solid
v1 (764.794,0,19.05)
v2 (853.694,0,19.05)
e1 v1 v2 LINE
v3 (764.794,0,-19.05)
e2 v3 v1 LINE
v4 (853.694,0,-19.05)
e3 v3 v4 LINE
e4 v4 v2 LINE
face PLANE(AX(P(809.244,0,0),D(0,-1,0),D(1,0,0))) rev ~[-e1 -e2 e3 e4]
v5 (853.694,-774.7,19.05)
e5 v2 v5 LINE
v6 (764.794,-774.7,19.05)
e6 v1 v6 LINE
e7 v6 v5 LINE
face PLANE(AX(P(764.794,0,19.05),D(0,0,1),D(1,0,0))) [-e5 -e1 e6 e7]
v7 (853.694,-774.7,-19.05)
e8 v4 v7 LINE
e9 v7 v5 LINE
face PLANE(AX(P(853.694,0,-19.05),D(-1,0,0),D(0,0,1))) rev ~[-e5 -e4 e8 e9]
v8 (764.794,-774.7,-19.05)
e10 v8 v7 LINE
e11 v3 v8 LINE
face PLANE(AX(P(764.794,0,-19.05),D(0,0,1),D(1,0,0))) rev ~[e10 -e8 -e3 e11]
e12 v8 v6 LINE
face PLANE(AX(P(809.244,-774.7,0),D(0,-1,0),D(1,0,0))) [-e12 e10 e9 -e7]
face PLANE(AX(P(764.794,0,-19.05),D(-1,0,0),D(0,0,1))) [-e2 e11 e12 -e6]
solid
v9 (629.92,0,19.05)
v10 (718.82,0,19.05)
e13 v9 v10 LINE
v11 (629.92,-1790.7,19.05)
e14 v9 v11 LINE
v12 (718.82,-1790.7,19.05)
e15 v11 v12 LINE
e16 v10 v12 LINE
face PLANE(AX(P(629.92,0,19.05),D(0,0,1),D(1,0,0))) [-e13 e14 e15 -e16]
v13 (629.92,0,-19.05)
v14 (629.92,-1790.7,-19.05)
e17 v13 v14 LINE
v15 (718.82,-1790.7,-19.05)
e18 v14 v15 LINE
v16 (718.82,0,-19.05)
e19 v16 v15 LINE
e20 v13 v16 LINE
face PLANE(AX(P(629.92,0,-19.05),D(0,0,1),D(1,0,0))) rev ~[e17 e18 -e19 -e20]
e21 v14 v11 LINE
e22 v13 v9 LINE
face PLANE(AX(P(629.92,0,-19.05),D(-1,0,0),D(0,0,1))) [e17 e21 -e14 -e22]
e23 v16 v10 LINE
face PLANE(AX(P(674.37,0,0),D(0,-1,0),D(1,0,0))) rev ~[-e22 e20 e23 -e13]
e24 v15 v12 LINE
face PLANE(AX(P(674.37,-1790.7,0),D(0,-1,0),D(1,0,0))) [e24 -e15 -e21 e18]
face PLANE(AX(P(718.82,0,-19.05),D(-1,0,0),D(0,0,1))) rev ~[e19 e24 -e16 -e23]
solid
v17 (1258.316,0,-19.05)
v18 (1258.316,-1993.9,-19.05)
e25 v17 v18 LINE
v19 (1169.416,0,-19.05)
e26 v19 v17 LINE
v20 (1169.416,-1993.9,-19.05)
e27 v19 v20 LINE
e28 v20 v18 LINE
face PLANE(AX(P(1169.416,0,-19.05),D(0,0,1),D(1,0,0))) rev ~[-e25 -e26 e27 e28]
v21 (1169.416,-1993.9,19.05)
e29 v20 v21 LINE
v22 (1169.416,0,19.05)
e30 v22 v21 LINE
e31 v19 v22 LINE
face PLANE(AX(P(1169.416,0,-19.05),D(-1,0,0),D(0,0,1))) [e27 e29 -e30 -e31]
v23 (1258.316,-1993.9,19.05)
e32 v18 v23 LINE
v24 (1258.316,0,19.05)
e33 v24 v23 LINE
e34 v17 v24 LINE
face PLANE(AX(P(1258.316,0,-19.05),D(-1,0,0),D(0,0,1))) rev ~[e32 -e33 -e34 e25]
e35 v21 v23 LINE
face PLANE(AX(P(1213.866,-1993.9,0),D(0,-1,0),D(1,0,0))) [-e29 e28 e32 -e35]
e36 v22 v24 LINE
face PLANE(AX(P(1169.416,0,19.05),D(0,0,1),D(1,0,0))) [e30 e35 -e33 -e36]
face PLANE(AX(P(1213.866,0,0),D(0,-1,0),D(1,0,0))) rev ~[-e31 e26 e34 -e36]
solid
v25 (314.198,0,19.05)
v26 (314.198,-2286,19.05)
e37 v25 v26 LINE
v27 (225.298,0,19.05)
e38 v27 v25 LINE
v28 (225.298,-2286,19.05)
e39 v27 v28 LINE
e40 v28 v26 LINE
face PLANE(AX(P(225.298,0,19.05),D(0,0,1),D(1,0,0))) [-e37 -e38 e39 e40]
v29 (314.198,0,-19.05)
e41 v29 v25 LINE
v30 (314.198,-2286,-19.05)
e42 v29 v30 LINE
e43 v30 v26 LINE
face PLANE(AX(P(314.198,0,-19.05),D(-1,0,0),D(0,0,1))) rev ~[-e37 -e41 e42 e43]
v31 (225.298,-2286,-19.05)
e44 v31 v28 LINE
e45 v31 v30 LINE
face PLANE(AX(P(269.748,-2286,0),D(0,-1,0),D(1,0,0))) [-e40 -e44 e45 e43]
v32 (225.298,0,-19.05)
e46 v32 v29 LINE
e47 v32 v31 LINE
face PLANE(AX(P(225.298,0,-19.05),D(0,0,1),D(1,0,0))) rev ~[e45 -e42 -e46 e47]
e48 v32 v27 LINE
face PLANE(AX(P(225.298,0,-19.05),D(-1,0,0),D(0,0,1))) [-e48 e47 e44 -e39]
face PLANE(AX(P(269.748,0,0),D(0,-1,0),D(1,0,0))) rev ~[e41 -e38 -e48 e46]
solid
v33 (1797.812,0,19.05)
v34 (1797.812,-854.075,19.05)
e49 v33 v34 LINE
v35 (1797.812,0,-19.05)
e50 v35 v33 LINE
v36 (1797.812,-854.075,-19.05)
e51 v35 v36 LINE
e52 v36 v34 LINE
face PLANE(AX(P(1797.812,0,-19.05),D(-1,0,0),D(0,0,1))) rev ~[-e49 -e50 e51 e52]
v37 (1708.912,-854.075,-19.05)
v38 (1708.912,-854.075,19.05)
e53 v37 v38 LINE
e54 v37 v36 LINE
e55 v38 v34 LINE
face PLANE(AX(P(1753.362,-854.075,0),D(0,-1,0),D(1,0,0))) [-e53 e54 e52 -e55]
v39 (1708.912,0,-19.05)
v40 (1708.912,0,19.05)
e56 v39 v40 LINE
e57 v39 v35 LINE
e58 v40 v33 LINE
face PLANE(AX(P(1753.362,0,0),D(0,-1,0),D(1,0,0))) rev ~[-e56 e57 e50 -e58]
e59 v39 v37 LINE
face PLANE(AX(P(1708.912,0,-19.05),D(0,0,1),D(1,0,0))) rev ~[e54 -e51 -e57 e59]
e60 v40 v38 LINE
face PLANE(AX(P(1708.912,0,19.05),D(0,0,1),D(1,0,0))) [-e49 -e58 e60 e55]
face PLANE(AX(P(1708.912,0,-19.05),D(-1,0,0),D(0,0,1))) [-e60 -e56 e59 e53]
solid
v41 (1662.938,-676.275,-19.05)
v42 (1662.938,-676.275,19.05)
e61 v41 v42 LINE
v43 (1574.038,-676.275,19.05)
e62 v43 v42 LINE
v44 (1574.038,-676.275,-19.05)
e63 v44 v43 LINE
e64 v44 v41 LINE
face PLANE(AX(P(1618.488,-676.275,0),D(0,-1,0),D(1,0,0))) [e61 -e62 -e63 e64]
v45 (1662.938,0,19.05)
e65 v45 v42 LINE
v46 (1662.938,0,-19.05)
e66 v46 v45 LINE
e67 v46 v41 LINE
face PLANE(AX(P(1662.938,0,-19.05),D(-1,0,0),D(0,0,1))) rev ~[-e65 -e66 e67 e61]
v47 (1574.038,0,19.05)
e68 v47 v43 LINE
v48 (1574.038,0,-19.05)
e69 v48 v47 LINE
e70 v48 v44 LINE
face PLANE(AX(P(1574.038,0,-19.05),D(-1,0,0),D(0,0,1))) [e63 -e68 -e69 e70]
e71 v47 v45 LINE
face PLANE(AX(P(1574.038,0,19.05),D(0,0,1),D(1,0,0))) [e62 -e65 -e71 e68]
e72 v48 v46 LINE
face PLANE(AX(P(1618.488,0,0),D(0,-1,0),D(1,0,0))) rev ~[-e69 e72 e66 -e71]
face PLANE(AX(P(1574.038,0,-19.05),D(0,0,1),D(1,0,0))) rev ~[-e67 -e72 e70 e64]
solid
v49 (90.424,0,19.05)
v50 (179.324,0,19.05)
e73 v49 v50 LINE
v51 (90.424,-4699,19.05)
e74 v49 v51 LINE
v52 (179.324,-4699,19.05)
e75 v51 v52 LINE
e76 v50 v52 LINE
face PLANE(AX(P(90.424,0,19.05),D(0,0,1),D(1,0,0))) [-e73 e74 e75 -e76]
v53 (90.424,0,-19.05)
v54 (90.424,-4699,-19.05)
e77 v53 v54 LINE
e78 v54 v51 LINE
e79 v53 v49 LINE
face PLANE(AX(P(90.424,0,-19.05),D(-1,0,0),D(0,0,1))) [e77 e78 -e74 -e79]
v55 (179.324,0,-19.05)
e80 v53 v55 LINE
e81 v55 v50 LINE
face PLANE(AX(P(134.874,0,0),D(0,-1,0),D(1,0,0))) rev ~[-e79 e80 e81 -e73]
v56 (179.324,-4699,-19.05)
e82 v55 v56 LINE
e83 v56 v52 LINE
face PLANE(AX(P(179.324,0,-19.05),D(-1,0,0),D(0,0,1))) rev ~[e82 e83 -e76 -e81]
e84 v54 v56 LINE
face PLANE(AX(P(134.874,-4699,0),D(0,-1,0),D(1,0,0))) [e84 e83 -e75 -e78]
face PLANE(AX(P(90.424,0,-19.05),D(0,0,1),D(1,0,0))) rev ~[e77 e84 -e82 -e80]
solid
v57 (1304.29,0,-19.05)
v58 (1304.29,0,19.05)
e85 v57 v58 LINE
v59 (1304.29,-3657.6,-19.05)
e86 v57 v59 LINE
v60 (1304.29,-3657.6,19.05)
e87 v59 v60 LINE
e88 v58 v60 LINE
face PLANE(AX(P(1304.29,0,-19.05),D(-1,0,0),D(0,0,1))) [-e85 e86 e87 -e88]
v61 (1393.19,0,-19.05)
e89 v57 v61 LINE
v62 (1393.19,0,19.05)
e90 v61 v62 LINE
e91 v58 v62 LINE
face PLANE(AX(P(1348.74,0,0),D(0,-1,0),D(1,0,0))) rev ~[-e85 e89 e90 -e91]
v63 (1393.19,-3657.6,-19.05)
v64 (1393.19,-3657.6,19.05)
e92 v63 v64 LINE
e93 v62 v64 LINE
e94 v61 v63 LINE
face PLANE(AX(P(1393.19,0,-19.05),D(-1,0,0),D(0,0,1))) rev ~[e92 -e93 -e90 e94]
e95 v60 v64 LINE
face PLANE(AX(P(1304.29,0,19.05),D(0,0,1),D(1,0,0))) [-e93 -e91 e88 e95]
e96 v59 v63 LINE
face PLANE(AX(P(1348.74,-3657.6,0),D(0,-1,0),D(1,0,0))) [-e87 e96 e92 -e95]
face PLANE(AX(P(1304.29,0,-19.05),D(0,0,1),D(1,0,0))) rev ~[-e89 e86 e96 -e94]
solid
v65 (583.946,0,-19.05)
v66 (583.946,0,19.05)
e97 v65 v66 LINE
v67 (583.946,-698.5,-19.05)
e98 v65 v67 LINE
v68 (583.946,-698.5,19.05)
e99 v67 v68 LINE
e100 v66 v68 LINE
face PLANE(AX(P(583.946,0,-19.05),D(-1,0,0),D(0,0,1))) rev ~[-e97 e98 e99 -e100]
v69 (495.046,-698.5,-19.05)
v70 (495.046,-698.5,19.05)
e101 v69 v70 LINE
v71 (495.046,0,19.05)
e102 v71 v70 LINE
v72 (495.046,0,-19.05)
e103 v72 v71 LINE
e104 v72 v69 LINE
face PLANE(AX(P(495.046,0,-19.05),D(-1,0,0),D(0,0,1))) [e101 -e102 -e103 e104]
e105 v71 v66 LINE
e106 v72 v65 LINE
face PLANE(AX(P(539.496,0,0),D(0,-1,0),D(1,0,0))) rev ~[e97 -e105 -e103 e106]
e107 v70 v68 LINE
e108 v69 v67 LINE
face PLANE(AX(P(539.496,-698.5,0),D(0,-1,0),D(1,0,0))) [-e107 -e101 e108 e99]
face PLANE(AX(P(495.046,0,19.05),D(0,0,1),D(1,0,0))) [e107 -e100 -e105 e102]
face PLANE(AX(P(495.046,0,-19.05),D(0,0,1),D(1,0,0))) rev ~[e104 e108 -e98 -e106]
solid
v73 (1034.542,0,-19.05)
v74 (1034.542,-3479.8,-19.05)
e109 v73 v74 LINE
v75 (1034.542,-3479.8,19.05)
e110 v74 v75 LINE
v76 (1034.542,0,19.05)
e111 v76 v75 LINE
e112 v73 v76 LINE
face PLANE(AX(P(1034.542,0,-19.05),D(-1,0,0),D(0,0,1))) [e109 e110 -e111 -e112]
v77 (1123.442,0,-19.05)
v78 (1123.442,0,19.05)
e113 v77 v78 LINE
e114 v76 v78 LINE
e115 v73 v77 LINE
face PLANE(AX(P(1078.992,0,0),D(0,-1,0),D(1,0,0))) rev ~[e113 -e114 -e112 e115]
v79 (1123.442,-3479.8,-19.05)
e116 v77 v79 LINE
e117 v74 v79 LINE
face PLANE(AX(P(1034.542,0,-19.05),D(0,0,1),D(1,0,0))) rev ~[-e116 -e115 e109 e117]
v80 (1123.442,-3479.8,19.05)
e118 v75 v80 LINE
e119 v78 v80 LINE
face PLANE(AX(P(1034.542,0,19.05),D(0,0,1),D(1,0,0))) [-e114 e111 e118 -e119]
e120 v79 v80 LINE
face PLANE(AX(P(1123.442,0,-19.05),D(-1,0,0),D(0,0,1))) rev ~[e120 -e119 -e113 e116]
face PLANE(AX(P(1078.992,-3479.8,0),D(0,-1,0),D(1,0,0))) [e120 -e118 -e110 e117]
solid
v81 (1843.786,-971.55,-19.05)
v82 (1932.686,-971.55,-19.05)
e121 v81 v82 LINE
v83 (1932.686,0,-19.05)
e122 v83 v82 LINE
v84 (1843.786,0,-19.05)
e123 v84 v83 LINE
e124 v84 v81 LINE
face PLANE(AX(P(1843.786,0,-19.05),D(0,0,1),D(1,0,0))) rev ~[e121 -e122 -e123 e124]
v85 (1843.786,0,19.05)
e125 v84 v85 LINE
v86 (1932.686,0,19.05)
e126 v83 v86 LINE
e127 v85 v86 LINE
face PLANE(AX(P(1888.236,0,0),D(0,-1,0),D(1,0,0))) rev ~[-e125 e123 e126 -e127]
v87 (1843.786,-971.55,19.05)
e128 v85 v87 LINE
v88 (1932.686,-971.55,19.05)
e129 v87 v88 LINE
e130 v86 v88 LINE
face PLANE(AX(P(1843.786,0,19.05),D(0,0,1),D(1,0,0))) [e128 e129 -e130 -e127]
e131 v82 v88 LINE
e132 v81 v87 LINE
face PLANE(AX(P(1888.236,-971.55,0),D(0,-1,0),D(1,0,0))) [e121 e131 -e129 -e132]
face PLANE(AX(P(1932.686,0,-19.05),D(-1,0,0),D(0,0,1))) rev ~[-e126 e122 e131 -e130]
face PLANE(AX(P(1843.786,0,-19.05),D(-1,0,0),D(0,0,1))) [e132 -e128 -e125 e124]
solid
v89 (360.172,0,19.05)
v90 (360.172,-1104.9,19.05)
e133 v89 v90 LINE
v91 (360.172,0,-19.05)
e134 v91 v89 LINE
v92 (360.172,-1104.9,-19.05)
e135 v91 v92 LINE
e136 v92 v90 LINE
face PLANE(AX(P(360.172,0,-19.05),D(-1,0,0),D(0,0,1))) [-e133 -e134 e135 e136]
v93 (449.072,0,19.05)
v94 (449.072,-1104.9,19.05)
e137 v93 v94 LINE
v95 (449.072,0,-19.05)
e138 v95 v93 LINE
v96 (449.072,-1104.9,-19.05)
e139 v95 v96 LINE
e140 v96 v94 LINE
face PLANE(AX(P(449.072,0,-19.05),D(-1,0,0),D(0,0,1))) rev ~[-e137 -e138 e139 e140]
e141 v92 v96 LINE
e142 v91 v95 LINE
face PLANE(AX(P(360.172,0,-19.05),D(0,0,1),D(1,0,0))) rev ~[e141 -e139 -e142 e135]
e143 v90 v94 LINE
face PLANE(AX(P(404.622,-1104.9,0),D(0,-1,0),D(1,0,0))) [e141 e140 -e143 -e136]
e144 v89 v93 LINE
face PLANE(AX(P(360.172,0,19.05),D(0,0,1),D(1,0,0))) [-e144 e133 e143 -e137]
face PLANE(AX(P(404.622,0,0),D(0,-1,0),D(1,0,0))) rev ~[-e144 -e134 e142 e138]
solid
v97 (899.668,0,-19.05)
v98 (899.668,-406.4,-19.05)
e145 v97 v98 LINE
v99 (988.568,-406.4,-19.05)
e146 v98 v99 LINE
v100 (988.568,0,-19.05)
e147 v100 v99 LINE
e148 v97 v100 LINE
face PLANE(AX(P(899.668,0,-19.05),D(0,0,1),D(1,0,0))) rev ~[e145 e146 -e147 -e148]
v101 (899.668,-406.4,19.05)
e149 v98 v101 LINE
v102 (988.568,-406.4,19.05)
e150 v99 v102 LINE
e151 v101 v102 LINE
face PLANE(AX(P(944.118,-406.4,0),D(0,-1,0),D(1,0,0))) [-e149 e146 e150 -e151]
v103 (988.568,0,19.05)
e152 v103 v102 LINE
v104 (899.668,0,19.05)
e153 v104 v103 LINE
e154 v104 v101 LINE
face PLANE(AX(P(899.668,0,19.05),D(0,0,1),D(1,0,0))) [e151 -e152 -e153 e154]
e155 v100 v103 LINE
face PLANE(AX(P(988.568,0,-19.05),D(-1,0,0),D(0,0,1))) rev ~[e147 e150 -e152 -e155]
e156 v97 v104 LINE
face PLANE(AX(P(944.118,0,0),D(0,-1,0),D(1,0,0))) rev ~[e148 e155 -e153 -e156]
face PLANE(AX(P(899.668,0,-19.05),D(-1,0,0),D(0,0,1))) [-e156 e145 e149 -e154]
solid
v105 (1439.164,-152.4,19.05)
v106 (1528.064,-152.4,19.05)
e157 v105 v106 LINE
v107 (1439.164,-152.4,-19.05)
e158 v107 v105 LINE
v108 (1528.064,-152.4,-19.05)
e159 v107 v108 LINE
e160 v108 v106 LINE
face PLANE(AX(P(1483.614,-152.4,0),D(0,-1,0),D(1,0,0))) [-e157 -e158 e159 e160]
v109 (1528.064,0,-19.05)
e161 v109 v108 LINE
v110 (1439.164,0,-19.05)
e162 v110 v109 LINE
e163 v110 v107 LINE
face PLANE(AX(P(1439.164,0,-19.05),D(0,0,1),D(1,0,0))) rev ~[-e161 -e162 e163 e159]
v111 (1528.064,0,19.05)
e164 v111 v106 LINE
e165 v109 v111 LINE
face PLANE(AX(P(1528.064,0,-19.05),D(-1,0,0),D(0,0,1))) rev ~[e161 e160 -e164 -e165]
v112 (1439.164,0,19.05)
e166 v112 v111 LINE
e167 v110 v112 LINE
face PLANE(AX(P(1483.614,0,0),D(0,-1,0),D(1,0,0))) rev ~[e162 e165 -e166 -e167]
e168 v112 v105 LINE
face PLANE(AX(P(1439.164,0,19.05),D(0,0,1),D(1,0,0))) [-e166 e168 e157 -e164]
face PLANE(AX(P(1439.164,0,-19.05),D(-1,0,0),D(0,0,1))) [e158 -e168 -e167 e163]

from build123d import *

# Parameters (mm, degrees)
F0_W      = 88.9
F0_H      = 38.1
F2_DEPTH  = 4699
F3_DEPTH  = 2286
F4_DEPTH  = 1104.9
F5_DEPTH  = 698.5
F6_DEPTH  = 1790.7
F7_DEPTH  = 774.7
F8_DEPTH  = 406.4
F9_DEPTH  = 3479.8
F10_DEPTH = 1993.9
F11_DEPTH = 3657.6
F12_DEPTH = 152.4
F13_DEPTH = 676.275
F14_DEPTH = 854.075
F15_DEPTH = 971.55


# Not quite as in the source:
# - a feature of the source that left no trace in its solid (it failed there, or was rolled back) is left out


with BuildPart() as f2:
    # F0 (on Front) → F2 (new body)
    with BuildSketch(Plane.XZ):
        with Locations((134.874, 0)):
            Rectangle(F0_W, F0_H)
    extrude(amount=F2_DEPTH)


with BuildPart() as f3:
    # F0 (on Front) → F3 (new body)
    with BuildSketch(Plane.XZ):
        with Locations((269.748, 0)):
            Rectangle(F0_W, F0_H)
    extrude(amount=F3_DEPTH)


with BuildPart() as f4:
    # F0 (on Front) → F4 (new body)
    with BuildSketch(Plane.XZ):
        with Locations((404.622, 0)):
            Rectangle(F0_W, F0_H)
    extrude(amount=F4_DEPTH)


with BuildPart() as f5:
    # F0 (on Front) → F5 (new body)
    with BuildSketch(Plane.XZ):
        with Locations((539.496, 0)):
            Rectangle(F0_W, F0_H)
    extrude(amount=F5_DEPTH)


with BuildPart() as f6:
    # F0 (on Front) → F6 (new body)
    with BuildSketch(Plane.XZ):
        with Locations((674.37, 0)):
            Rectangle(F0_W, F0_H)
    extrude(amount=F6_DEPTH)


with BuildPart() as f7:
    # F0 (on Front) → F7 (new body)
    with BuildSketch(Plane.XZ):
        with Locations((809.244, 0)):
            Rectangle(F0_W, F0_H)
    extrude(amount=F7_DEPTH)


with BuildPart() as f8:
    # F0 (on Front) → F8 (new body)
    with BuildSketch(Plane.XZ):
        with Locations((944.118, 0)):
            Rectangle(F0_W, F0_H)
    extrude(amount=F8_DEPTH)


with BuildPart() as f9:
    # F0 (on Front) → F9 (new body)
    with BuildSketch(Plane.XZ):
        with Locations((1078.992, 0)):
            Rectangle(F0_W, F0_H)
    extrude(amount=F9_DEPTH)


with BuildPart() as f10:
    # F0 (on Front) → F10 (new body)
    with BuildSketch(Plane.XZ):
        with Locations((1213.866, 0)):
            Rectangle(F0_W, F0_H)
    extrude(amount=F10_DEPTH)


with BuildPart() as f11:
    # F0 (on Front) → F11 (new body)
    with BuildSketch(Plane.XZ):
        with Locations((1348.74, 0)):
            Rectangle(F0_W, F0_H)
    extrude(amount=F11_DEPTH)


with BuildPart() as f12:
    # F0 (on Front) → F12 (new body)
    with BuildSketch(Plane.XZ):
        with Locations((1483.614, 0)):
            Rectangle(F0_W, F0_H)
    extrude(amount=F12_DEPTH)


with BuildPart() as f13:
    # F0 (on Front) → F13 (new body)
    with BuildSketch(Plane.XZ):
        with Locations((1618.488, 0)):
            Rectangle(F0_W, F0_H)
    extrude(amount=F13_DEPTH)


with BuildPart() as f14:
    # F0 (on Front) → F14 (new body)
    with BuildSketch(Plane.XZ):
        with Locations((1753.362, 0)):
            Rectangle(F0_W, F0_H)
    extrude(amount=F14_DEPTH)


with BuildPart() as f15:
    # F0 (on Front) → F15 (new body)
    with BuildSketch(Plane.XZ):
        with Locations((1888.236, 0)):
            Rectangle(F0_W, F0_H)
    extrude(amount=F15_DEPTH)


solid = Compound([f2.part, f3.part, f4.part, f5.part, f6.part, f7.part, f8.part, f9.part, f10.part, f11.part, f12.part, f13.part, f14.part, f15.part])
